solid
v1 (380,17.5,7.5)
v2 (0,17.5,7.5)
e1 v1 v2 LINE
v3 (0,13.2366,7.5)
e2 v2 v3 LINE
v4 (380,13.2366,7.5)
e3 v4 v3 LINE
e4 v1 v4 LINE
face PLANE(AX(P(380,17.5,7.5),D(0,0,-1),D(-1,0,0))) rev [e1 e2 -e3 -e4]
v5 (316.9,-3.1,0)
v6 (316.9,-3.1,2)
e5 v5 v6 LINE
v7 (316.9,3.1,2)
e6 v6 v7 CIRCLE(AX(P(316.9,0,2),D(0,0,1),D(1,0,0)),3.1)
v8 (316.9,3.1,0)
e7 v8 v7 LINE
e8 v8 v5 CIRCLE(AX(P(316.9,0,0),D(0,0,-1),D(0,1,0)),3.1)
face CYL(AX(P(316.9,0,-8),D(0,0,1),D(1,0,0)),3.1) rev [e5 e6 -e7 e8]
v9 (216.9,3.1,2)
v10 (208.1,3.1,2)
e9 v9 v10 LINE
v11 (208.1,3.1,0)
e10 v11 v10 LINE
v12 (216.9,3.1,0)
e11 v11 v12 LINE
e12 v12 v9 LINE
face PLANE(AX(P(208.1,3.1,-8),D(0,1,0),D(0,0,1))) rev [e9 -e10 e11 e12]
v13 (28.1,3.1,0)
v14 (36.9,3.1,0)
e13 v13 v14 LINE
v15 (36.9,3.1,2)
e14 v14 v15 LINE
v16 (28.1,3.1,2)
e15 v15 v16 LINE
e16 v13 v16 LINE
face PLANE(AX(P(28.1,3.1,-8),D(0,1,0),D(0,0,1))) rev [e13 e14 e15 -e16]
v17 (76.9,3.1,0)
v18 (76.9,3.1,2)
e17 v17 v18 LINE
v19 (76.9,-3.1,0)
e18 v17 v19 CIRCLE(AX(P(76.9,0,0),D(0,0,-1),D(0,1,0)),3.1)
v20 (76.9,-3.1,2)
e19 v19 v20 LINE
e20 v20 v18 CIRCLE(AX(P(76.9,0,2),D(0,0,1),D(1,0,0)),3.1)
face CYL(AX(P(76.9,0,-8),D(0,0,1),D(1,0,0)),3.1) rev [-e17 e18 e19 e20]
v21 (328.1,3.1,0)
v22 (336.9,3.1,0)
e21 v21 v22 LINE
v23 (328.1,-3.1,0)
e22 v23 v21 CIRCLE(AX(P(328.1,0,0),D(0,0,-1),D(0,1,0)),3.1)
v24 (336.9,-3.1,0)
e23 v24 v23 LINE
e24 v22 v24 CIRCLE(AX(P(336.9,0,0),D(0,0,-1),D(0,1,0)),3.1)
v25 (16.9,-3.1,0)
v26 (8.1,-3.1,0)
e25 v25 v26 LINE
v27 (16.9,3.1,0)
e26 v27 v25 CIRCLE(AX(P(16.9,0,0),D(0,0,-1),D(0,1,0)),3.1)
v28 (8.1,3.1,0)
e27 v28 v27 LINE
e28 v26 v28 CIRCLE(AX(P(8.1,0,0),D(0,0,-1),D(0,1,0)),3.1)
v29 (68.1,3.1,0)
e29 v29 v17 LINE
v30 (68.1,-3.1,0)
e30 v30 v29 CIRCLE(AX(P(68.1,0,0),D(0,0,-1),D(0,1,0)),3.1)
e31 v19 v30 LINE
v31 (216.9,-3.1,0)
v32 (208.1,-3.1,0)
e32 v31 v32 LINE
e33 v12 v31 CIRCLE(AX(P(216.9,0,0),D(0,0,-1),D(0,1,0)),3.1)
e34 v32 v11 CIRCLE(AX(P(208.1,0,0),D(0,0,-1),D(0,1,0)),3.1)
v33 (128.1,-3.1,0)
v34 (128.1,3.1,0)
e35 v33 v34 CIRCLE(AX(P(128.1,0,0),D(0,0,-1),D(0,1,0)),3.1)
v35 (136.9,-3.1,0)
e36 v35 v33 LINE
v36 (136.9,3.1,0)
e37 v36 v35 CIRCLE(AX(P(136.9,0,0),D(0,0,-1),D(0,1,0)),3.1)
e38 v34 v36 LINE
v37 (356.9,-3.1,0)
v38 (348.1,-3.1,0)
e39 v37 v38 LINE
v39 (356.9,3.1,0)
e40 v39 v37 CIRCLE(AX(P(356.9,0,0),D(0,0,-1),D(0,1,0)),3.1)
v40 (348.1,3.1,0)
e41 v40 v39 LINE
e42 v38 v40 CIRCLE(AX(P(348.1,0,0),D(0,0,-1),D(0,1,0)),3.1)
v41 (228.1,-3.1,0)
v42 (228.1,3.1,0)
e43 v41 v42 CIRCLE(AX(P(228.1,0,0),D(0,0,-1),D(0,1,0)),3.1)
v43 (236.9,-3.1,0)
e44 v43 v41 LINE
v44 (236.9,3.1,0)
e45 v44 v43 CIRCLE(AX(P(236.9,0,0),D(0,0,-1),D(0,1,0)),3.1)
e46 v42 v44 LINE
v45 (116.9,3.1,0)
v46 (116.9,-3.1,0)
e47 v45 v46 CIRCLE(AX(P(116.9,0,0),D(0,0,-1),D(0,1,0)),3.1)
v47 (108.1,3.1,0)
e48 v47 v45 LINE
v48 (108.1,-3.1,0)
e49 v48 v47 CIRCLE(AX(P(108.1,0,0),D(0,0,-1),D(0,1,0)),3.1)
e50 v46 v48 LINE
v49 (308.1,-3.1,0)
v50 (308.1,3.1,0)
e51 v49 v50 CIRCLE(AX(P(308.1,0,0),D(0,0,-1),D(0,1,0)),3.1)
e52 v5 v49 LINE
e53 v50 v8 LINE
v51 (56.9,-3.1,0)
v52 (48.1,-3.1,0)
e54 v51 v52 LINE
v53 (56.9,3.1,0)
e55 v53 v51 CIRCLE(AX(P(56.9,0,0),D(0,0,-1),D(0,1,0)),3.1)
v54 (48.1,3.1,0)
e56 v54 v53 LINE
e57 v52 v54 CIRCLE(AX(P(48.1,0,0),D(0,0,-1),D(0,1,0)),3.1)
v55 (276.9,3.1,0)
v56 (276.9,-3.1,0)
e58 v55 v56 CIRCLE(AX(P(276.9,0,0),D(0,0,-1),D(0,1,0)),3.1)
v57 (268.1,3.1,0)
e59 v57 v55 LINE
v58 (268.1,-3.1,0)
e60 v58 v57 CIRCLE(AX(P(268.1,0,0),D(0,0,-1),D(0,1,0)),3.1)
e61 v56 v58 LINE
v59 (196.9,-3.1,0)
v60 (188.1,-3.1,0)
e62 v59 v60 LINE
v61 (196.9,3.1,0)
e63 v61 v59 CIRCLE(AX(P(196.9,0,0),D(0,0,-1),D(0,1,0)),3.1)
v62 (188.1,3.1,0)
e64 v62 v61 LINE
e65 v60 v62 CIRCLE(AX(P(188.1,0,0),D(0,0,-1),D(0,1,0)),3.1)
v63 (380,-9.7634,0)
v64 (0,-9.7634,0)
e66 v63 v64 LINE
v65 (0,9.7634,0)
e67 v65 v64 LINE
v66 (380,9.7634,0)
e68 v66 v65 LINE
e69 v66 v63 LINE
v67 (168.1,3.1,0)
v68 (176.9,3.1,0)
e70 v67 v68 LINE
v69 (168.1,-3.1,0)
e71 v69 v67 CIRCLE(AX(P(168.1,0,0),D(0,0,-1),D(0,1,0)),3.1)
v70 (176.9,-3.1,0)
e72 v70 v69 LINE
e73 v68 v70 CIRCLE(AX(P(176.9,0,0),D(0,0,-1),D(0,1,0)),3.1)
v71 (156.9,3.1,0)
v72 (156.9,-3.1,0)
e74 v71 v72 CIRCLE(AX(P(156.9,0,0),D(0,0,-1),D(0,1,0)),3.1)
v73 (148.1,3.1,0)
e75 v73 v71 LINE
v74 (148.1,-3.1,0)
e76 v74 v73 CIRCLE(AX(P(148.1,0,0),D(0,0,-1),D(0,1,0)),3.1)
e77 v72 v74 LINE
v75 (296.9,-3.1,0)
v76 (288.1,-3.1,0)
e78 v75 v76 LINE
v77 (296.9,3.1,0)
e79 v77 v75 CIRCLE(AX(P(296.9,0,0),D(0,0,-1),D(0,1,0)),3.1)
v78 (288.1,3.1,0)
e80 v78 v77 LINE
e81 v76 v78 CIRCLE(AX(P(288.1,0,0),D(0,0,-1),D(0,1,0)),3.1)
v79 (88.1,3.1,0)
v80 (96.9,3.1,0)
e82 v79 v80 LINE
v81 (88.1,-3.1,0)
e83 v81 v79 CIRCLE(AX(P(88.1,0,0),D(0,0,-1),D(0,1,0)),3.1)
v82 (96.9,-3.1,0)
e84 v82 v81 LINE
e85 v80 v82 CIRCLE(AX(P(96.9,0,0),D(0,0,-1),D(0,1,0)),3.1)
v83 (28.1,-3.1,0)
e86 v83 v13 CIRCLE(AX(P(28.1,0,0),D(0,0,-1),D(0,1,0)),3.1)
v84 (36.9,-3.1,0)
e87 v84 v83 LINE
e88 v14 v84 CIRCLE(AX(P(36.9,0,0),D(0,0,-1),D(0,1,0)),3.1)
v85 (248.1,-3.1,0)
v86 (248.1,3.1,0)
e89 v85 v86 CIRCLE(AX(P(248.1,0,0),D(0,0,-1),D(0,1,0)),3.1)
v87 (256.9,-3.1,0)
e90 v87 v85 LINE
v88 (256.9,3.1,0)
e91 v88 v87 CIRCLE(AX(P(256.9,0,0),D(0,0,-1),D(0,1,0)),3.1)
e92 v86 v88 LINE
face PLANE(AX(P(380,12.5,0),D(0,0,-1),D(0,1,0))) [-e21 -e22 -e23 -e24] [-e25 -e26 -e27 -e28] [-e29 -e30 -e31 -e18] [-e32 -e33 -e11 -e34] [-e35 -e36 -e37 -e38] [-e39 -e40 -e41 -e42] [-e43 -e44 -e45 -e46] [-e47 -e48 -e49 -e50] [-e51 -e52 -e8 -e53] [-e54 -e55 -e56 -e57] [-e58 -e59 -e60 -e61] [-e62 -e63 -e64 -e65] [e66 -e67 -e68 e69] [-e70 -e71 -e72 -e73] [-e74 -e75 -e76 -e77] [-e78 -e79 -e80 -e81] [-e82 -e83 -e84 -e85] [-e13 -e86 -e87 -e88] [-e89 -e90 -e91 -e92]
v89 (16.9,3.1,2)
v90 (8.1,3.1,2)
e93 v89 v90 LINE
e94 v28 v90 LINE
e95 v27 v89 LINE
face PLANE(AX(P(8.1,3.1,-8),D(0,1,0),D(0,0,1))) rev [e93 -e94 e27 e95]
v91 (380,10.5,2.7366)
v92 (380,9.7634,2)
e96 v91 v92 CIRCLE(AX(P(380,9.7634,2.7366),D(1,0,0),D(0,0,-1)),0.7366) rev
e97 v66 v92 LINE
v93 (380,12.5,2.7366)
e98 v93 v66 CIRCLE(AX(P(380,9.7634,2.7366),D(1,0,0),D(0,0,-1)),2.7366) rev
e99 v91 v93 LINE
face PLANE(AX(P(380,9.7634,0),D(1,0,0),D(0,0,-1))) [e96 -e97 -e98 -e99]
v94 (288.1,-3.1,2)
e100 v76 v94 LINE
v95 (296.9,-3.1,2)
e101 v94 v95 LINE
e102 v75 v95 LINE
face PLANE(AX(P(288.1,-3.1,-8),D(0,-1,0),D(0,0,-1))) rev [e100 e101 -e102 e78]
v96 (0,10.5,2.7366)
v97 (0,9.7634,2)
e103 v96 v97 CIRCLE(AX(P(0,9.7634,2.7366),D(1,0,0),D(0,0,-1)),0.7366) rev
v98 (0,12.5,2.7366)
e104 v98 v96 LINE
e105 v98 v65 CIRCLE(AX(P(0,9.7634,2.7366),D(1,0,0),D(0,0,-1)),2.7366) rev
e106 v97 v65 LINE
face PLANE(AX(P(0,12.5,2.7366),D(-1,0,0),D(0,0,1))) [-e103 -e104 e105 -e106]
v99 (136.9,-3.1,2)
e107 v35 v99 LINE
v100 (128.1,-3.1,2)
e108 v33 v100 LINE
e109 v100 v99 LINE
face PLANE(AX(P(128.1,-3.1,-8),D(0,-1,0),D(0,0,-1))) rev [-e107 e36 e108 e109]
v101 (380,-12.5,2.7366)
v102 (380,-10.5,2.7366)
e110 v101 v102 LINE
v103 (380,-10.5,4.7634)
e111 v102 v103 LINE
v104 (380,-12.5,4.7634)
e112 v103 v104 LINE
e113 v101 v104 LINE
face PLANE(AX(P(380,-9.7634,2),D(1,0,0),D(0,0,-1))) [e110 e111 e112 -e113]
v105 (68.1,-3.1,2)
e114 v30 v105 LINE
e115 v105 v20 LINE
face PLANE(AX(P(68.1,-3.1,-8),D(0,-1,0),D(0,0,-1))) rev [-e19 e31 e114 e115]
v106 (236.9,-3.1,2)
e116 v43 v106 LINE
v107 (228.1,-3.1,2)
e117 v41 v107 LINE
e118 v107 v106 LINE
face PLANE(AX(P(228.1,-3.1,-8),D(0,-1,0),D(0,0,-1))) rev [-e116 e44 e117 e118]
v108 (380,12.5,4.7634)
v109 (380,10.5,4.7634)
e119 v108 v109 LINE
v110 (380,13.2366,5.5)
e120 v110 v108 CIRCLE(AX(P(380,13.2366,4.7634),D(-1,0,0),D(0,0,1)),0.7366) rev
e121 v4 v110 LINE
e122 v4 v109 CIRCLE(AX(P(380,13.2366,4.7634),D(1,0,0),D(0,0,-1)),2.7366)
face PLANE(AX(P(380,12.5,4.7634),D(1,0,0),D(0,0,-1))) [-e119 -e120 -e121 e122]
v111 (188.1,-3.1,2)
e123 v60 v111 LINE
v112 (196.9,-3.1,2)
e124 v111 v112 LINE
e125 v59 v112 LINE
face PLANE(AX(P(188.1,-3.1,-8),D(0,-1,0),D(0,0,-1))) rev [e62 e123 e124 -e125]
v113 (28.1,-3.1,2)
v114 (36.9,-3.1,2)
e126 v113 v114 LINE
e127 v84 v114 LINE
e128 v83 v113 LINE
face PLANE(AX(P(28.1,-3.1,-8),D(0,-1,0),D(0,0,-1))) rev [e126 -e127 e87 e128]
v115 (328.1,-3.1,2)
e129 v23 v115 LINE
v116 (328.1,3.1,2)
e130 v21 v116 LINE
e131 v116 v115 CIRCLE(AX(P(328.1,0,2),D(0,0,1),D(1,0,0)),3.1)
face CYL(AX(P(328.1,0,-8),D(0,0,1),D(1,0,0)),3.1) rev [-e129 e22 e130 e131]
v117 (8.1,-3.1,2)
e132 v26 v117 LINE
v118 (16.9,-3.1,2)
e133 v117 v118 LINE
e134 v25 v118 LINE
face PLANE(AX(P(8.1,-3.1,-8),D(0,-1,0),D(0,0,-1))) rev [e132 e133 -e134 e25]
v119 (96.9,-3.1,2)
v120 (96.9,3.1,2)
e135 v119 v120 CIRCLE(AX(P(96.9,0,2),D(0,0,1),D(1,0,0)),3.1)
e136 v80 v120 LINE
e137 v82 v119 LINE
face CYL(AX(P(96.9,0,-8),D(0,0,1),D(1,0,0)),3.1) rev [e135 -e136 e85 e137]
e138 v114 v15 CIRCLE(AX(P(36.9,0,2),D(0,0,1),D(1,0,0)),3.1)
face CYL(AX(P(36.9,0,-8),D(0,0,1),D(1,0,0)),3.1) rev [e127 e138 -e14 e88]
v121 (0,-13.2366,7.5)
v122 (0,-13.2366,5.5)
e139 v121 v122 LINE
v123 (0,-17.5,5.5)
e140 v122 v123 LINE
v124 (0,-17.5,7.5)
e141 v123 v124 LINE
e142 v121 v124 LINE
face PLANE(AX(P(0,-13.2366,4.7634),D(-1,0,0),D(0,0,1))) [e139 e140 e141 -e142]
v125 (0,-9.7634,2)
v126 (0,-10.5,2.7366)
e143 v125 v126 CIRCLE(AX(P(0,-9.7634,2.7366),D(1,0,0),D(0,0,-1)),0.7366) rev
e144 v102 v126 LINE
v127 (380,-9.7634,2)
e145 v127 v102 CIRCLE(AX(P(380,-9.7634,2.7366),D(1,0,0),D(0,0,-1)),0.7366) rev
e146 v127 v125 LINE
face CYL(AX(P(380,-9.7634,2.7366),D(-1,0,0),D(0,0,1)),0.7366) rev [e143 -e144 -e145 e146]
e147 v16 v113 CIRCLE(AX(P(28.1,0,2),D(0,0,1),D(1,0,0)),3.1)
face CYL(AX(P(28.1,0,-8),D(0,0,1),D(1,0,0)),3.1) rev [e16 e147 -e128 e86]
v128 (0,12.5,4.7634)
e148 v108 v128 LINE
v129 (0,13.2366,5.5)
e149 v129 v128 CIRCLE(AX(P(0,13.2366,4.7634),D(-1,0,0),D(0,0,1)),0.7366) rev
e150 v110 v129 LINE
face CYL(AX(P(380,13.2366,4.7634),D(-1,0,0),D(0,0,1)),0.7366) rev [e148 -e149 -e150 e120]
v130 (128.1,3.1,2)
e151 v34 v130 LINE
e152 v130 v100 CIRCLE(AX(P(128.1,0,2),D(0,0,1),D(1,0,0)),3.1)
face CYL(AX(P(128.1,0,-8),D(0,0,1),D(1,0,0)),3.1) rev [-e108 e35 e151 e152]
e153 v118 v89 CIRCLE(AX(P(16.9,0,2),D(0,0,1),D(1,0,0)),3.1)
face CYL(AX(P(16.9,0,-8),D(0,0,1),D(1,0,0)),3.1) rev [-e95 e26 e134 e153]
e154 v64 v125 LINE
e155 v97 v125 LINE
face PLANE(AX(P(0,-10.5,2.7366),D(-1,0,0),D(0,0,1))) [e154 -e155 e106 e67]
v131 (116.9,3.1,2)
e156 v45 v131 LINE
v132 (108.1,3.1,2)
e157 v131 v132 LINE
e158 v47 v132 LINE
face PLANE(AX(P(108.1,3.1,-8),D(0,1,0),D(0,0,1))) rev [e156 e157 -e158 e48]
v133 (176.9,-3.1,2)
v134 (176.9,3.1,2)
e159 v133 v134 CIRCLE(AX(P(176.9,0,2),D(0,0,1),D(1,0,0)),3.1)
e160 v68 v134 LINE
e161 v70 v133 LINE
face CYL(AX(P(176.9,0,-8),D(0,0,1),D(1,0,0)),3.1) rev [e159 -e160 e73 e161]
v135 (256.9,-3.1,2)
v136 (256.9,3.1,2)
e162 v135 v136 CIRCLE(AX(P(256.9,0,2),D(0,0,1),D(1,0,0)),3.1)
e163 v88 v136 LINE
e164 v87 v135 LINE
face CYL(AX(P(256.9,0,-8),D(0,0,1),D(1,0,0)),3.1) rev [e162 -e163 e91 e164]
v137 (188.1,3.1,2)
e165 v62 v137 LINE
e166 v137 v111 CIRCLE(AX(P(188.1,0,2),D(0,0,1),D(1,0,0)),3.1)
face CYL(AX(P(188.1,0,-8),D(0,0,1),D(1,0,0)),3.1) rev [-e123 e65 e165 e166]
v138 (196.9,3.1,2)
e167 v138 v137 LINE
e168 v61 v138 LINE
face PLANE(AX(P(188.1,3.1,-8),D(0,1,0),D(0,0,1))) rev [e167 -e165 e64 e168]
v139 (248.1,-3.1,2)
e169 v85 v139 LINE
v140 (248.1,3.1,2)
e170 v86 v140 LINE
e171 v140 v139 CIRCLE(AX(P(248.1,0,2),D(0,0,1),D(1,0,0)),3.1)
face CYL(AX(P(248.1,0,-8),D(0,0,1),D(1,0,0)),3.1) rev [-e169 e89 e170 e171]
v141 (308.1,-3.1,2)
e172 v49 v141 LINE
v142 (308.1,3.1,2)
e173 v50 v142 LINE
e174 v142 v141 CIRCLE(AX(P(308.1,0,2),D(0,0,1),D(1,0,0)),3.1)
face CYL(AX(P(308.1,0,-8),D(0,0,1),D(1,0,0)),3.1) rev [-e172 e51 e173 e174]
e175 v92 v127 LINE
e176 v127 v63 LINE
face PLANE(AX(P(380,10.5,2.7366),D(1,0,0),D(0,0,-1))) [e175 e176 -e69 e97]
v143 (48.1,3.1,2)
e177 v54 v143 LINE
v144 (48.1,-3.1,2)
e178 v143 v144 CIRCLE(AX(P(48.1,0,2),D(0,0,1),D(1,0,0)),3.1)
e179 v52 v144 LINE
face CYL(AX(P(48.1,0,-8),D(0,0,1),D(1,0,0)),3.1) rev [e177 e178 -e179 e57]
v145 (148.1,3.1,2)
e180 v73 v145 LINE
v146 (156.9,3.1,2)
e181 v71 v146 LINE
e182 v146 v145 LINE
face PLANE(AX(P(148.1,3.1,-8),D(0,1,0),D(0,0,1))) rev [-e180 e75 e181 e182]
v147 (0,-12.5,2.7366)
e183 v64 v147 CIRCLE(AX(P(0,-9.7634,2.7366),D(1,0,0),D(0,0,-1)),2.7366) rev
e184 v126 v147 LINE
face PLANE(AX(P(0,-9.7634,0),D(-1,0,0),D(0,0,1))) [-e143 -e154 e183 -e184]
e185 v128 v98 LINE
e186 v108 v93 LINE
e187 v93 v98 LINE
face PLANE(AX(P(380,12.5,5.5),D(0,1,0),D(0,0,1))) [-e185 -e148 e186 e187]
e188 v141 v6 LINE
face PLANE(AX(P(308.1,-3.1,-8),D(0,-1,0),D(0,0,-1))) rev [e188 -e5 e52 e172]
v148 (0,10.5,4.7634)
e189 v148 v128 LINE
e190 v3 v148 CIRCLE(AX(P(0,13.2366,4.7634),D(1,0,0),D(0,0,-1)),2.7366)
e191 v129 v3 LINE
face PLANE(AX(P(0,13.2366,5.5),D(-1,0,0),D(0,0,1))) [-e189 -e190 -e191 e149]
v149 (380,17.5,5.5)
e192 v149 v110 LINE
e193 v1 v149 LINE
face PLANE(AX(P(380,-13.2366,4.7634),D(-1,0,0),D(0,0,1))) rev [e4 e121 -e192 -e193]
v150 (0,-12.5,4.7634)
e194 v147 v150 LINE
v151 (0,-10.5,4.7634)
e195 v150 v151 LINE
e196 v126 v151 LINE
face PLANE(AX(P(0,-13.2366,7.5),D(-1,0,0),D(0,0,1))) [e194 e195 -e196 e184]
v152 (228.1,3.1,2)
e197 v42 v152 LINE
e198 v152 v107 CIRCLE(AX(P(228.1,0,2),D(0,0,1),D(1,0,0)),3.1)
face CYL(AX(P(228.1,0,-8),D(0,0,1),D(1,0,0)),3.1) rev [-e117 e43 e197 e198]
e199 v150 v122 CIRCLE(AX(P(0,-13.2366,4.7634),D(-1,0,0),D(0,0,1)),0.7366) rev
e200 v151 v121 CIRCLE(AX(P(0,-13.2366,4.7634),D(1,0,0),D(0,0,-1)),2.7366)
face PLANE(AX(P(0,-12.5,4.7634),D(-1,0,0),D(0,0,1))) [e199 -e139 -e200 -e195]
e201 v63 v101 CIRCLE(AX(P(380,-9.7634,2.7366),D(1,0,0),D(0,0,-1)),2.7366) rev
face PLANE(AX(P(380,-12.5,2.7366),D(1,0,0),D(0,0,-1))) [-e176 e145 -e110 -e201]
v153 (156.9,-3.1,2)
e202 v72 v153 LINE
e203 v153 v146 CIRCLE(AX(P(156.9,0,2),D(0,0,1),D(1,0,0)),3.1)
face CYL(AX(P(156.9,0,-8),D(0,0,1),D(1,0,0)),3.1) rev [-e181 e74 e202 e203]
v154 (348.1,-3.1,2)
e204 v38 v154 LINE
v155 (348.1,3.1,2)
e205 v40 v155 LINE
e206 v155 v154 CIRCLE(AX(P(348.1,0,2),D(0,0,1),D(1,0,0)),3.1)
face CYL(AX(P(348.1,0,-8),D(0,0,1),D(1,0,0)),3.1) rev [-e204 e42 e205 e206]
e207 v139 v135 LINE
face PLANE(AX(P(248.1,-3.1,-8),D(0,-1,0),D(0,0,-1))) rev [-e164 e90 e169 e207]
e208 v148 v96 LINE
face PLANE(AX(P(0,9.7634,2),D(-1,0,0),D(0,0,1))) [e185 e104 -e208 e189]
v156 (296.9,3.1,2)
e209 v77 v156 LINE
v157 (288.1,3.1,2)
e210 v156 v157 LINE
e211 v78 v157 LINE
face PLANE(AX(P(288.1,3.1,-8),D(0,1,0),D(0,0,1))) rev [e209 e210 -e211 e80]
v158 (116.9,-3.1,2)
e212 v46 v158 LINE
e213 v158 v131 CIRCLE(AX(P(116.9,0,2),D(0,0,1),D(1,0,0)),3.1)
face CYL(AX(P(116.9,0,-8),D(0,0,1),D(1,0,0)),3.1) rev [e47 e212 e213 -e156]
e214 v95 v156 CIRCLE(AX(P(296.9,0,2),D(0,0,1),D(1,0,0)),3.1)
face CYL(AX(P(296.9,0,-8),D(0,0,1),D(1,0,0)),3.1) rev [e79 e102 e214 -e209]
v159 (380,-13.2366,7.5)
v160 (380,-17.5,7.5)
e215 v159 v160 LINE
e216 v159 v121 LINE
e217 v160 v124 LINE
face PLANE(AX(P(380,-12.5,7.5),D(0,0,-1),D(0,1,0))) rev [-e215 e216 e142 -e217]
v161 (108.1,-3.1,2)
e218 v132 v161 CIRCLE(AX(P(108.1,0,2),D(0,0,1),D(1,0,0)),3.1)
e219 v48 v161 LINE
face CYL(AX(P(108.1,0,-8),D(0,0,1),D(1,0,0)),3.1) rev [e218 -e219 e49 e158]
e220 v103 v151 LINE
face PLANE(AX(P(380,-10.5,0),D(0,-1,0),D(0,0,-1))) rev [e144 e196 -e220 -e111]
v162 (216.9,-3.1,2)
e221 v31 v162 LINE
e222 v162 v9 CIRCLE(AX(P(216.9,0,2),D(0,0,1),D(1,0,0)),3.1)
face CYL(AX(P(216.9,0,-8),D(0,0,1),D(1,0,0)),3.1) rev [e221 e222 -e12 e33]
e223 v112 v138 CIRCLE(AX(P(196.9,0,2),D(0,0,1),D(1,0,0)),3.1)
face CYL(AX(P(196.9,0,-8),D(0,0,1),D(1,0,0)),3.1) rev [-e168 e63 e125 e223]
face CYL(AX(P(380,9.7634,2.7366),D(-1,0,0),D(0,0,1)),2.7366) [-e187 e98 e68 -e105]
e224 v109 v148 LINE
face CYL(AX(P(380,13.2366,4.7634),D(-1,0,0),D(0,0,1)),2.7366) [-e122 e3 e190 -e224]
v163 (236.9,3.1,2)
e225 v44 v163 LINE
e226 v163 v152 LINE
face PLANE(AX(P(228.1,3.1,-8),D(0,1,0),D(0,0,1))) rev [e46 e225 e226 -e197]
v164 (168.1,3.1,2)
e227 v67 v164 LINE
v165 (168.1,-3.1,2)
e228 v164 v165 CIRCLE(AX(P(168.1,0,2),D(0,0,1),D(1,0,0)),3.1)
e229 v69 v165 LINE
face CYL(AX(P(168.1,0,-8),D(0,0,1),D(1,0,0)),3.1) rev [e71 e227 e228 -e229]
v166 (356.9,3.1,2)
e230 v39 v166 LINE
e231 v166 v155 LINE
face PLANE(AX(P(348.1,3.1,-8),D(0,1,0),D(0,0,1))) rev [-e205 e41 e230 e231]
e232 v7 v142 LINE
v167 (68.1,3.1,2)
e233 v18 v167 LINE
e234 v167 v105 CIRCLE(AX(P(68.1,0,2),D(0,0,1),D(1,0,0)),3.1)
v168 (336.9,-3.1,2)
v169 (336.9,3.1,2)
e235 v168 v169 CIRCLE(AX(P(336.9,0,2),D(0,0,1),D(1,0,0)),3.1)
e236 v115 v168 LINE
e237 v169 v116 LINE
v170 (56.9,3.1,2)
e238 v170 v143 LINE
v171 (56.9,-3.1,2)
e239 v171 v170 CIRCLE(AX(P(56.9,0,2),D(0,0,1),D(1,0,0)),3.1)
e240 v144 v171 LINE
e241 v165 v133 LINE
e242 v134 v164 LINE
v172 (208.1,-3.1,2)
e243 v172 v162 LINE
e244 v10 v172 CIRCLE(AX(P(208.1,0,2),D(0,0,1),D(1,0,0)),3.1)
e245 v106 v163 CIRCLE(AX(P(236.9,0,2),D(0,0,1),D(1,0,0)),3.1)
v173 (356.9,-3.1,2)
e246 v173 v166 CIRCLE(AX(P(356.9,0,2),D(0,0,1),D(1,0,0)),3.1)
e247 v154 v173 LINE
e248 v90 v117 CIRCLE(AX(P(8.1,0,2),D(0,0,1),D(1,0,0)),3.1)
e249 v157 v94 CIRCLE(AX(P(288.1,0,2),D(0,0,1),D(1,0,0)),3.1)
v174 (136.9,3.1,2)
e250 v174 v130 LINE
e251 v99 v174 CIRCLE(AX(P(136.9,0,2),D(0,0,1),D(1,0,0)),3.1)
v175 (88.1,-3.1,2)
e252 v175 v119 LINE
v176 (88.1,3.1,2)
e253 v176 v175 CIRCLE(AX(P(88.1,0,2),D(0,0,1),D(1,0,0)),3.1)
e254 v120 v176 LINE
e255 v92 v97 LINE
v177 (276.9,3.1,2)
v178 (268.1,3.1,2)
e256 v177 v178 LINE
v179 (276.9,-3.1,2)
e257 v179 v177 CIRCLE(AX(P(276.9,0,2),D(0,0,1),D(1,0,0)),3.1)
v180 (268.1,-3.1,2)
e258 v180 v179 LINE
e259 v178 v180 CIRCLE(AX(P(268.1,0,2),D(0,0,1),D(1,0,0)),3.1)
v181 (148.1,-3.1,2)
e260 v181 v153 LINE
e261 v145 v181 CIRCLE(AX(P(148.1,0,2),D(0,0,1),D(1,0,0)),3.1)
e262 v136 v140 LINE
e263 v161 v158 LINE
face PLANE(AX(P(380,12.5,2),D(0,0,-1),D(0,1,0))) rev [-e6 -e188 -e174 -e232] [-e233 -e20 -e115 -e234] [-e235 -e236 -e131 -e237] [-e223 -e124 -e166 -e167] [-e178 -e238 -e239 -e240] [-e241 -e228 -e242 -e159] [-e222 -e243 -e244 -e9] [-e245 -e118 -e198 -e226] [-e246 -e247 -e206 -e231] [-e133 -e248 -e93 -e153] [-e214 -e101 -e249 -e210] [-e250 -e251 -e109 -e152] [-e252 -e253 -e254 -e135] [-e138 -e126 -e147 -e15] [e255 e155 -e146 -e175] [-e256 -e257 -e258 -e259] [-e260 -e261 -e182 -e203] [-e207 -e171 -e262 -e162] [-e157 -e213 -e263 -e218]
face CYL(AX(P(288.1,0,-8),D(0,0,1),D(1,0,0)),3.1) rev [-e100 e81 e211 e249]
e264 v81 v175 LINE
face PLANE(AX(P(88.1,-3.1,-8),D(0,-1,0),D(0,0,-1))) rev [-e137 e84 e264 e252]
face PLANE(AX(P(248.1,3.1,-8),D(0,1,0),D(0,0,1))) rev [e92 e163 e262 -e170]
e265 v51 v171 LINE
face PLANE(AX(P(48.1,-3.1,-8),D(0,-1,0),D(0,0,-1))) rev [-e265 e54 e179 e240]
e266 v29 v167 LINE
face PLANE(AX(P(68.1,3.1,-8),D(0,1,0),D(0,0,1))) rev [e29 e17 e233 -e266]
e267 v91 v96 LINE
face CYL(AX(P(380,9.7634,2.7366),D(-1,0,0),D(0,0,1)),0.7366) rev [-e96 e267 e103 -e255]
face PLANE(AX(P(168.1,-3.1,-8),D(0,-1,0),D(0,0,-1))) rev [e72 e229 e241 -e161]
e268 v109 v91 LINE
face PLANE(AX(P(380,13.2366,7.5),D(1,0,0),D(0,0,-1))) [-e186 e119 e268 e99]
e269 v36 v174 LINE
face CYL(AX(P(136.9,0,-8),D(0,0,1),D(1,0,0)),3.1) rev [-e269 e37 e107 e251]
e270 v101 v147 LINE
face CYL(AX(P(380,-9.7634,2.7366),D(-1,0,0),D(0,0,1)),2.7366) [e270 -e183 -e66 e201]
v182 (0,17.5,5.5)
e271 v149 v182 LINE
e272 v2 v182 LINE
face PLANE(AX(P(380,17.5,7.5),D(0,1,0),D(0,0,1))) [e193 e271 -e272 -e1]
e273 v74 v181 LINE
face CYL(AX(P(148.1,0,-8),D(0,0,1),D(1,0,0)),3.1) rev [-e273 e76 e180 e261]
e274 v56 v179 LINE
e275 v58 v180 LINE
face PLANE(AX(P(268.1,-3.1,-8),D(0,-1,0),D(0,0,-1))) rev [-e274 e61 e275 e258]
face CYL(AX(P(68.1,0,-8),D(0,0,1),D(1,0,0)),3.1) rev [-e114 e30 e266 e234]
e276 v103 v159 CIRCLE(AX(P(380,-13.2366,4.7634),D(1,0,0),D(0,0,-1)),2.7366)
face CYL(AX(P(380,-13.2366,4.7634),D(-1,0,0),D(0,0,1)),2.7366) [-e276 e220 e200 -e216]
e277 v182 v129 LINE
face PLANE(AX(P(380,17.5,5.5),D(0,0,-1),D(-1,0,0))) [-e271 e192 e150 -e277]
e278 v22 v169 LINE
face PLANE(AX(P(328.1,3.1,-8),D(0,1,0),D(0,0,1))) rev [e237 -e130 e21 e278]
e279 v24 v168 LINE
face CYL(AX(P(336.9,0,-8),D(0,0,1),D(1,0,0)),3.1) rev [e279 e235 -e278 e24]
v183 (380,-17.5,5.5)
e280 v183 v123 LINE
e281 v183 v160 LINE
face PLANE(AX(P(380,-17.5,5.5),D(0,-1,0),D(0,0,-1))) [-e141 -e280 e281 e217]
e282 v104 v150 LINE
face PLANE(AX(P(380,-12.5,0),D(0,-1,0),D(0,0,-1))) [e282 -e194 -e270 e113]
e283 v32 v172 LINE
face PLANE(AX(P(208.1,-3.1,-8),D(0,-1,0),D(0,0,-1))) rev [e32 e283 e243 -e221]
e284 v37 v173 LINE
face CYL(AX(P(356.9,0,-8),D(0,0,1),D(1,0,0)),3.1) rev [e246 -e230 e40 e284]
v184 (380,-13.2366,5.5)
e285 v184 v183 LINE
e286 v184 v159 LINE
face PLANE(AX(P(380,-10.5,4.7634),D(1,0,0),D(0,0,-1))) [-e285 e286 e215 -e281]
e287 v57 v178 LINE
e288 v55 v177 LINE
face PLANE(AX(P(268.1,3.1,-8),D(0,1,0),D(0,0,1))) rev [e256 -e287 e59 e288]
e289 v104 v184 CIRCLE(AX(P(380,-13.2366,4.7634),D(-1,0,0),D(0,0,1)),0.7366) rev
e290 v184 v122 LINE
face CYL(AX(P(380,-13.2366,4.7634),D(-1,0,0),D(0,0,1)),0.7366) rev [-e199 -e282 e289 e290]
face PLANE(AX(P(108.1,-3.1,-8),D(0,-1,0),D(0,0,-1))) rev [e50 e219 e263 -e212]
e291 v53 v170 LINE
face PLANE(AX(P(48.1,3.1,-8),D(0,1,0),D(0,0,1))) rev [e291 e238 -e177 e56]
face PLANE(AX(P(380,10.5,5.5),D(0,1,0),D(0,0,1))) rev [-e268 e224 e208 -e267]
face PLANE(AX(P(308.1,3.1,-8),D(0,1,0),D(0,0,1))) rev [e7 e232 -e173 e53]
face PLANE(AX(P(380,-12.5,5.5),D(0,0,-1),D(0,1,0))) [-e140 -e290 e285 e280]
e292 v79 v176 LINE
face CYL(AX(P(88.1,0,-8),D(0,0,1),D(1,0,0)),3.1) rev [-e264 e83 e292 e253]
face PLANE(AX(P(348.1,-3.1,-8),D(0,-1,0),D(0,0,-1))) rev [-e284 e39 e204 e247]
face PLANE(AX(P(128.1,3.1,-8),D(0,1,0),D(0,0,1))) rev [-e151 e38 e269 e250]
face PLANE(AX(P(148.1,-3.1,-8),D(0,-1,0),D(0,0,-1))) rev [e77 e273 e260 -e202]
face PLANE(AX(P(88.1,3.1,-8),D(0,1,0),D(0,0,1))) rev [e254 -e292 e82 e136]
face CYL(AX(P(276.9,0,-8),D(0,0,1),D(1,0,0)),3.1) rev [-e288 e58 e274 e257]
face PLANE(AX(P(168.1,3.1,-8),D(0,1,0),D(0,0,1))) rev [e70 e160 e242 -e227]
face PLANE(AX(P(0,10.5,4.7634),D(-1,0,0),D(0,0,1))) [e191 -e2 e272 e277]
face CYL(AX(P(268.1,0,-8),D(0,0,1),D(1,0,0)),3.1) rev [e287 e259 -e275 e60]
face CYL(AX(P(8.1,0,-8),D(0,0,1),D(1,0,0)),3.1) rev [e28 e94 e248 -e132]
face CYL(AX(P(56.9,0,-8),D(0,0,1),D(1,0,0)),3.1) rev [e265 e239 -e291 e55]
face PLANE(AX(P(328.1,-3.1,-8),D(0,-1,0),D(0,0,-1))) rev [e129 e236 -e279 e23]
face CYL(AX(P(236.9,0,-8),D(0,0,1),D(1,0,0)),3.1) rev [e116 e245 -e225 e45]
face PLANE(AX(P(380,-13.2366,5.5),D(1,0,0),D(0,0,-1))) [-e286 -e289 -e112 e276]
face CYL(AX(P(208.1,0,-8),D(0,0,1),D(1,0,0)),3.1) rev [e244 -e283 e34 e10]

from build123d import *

# Parameters (mm, degrees)
TABAN_FLAN_4_DEPTH     = 380
KES_EKSTR_ZYON11_DEPTH = 10


# Sheet-metal steps are written as plain solids
with BuildPart() as part:
    # Çizim18 → Taban-Flanş4 (new body)
    with BuildSketch(Plane(origin=(0, 0, 0), x_dir=(0, 0, -1), z_dir=(1, 0, 0))):
        with BuildLine():
            Line((-5.5, 17.5), (-5.5, 13.2366))
            ThreePointArc((-5.5, 13.2366), (-5.284254855, 12.715745145), (-4.7634, 12.5))
            Line((-4.7634, 12.5), (-2.7366, 12.5))
            ThreePointArc((-2.7366, 12.5), (-0.801531583, 11.698468417), (0, 9.7634))
            Line((0, 9.7634), (0, -9.7634))
            ThreePointArc((0, -9.7634), (-0.801531583, -11.698468417), (-2.7366, -12.5))
            Line((-2.7366, -12.5), (-4.7634, -12.5))
            ThreePointArc((-4.7634, -12.5), (-5.284254855, -12.715745145), (-5.5, -13.2366))
            Line((-5.5, -13.2366), (-5.5, -17.5))
            Line((-5.5, -17.5), (-7.5, -17.5))
            Line((-7.5, -17.5), (-7.5, -13.2366))
            ThreePointArc((-7.5, -13.2366), (-6.698468417, -11.301531583), (-4.7634, -10.5))
            Line((-4.7634, -10.5), (-2.7366, -10.5))
            ThreePointArc((-2.7366, -10.5), (-2.215745145, -10.284254855), (-2, -9.7634))
            Line((-2, -9.7634), (-2, 9.7634))
            ThreePointArc((-2, 9.7634), (-2.215745145, 10.284254855), (-2.7366, 10.5))
            Line((-2.7366, 10.5), (-4.7634, 10.5))
            ThreePointArc((-4.7634, 10.5), (-6.698468417, 11.301531583), (-7.5, 13.2366))
            Line((-7.5, 13.2366), (-7.5, 17.5))
            Line((-7.5, 17.5), (-5.5, 17.5))
        make_face()
    extrude(amount=TABAN_FLAN_4_DEPTH)

    # Çizim21 → Kes-Ekstrüzyon11 (cut)
    with BuildSketch(Plane.XY.offset(2)):
        with BuildLine():
            Line((8.1, 3.1), (16.9, 3.1))
            ThreePointArc((16.9, 3.1), (20, 0), (16.9, -3.1))
            Line((16.9, -3.1), (8.1, -3.1))
            ThreePointArc((8.1, -3.1), (5, 0), (8.1, 3.1))
        make_face()
        with BuildLine():
            Line((28.1, 3.1), (36.9, 3.1))
            ThreePointArc((36.9, 3.1), (40, 0), (36.9, -3.1))
            Line((36.9, -3.1), (28.1, -3.1))
            ThreePointArc((28.1, -3.1), (25, 0), (28.1, 3.1))
        make_face()
        with BuildLine():
            Line((48.1, 3.1), (56.9, 3.1))
            ThreePointArc((56.9, 3.1), (60, 0), (56.9, -3.1))
            Line((56.9, -3.1), (48.1, -3.1))
            ThreePointArc((48.1, -3.1), (45, 0), (48.1, 3.1))
        make_face()
        with BuildLine():
            Line((68.1, 3.1), (76.9, 3.1))
            ThreePointArc((76.9, 3.1), (80, 0), (76.9, -3.1))
            Line((76.9, -3.1), (68.1, -3.1))
            ThreePointArc((68.1, -3.1), (65, 0), (68.1, 3.1))
        make_face()
        with BuildLine():
            Line((88.1, 3.1), (96.9, 3.1))
            ThreePointArc((96.9, 3.1), (100, 0), (96.9, -3.1))
            Line((96.9, -3.1), (88.1, -3.1))
            ThreePointArc((88.1, -3.1), (85, 0), (88.1, 3.1))
        make_face()
        with BuildLine():
            Line((108.1, 3.1), (116.9, 3.1))
            ThreePointArc((116.9, 3.1), (120, 0), (116.9, -3.1))
            Line((116.9, -3.1), (108.1, -3.1))
            ThreePointArc((108.1, -3.1), (105, 0), (108.1, 3.1))
        make_face()
        with BuildLine():
            Line((128.1, 3.1), (136.9, 3.1))
            ThreePointArc((136.9, 3.1), (140, 0), (136.9, -3.1))
            Line((136.9, -3.1), (128.1, -3.1))
            ThreePointArc((128.1, -3.1), (125, 0), (128.1, 3.1))
        make_face()
        with BuildLine():
            Line((148.1, 3.1), (156.9, 3.1))
            ThreePointArc((156.9, 3.1), (160, 0), (156.9, -3.1))
            Line((156.9, -3.1), (148.1, -3.1))
            ThreePointArc((148.1, -3.1), (145, 0), (148.1, 3.1))
        make_face()
        with BuildLine():
            Line((168.1, 3.1), (176.9, 3.1))
            ThreePointArc((176.9, 3.1), (180, 0), (176.9, -3.1))
            Line((176.9, -3.1), (168.1, -3.1))
            ThreePointArc((168.1, -3.1), (165, 0), (168.1, 3.1))
        make_face()
        with BuildLine():
            Line((188.1, 3.1), (196.9, 3.1))
            ThreePointArc((196.9, 3.1), (200, 0), (196.9, -3.1))
            Line((196.9, -3.1), (188.1, -3.1))
            ThreePointArc((188.1, -3.1), (185, 0), (188.1, 3.1))
        make_face()
        with BuildLine():
            Line((208.1, 3.1), (216.9, 3.1))
            ThreePointArc((216.9, 3.1), (220, 0), (216.9, -3.1))
            Line((216.9, -3.1), (208.1, -3.1))
            ThreePointArc((208.1, -3.1), (205, 0), (208.1, 3.1))
        make_face()
        with BuildLine():
            Line((228.1, 3.1), (236.9, 3.1))
            ThreePointArc((236.9, 3.1), (240, 0), (236.9, -3.1))
            Line((236.9, -3.1), (228.1, -3.1))
            ThreePointArc((228.1, -3.1), (225, 0), (228.1, 3.1))
        make_face()
        with BuildLine():
            Line((248.1, 3.1), (256.9, 3.1))
            ThreePointArc((256.9, 3.1), (260, 0), (256.9, -3.1))
            Line((256.9, -3.1), (248.1, -3.1))
            ThreePointArc((248.1, -3.1), (245, 0), (248.1, 3.1))
        make_face()
        with BuildLine():
            Line((268.1, 3.1), (276.9, 3.1))
            ThreePointArc((276.9, 3.1), (280, 0), (276.9, -3.1))
            Line((276.9, -3.1), (268.1, -3.1))
            ThreePointArc((268.1, -3.1), (265, 0), (268.1, 3.1))
        make_face()
        with BuildLine():
            Line((288.1, 3.1), (296.9, 3.1))
            ThreePointArc((296.9, 3.1), (300, 0), (296.9, -3.1))
            Line((296.9, -3.1), (288.1, -3.1))
            ThreePointArc((288.1, -3.1), (285, 0), (288.1, 3.1))
        make_face()
        with BuildLine():
            Line((308.1, 3.1), (316.9, 3.1))
            ThreePointArc((316.9, 3.1), (320, 0), (316.9, -3.1))
            Line((316.9, -3.1), (308.1, -3.1))
            ThreePointArc((308.1, -3.1), (305, 0), (308.1, 3.1))
        make_face()
        with BuildLine():
            Line((328.1, 3.1), (336.9, 3.1))
            ThreePointArc((336.9, 3.1), (340, 0), (336.9, -3.1))
            Line((336.9, -3.1), (328.1, -3.1))
            ThreePointArc((328.1, -3.1), (325, 0), (328.1, 3.1))
        make_face()
        with BuildLine():
            Line((348.1, 3.1), (356.9, 3.1))
            ThreePointArc((356.9, 3.1), (360, 0), (356.9, -3.1))
            Line((356.9, -3.1), (348.1, -3.1))
            ThreePointArc((348.1, -3.1), (345, 0), (348.1, 3.1))
        make_face()
    extrude(amount=-KES_EKSTR_ZYON11_DEPTH, mode=Mode.SUBTRACT)


solid = part.part
